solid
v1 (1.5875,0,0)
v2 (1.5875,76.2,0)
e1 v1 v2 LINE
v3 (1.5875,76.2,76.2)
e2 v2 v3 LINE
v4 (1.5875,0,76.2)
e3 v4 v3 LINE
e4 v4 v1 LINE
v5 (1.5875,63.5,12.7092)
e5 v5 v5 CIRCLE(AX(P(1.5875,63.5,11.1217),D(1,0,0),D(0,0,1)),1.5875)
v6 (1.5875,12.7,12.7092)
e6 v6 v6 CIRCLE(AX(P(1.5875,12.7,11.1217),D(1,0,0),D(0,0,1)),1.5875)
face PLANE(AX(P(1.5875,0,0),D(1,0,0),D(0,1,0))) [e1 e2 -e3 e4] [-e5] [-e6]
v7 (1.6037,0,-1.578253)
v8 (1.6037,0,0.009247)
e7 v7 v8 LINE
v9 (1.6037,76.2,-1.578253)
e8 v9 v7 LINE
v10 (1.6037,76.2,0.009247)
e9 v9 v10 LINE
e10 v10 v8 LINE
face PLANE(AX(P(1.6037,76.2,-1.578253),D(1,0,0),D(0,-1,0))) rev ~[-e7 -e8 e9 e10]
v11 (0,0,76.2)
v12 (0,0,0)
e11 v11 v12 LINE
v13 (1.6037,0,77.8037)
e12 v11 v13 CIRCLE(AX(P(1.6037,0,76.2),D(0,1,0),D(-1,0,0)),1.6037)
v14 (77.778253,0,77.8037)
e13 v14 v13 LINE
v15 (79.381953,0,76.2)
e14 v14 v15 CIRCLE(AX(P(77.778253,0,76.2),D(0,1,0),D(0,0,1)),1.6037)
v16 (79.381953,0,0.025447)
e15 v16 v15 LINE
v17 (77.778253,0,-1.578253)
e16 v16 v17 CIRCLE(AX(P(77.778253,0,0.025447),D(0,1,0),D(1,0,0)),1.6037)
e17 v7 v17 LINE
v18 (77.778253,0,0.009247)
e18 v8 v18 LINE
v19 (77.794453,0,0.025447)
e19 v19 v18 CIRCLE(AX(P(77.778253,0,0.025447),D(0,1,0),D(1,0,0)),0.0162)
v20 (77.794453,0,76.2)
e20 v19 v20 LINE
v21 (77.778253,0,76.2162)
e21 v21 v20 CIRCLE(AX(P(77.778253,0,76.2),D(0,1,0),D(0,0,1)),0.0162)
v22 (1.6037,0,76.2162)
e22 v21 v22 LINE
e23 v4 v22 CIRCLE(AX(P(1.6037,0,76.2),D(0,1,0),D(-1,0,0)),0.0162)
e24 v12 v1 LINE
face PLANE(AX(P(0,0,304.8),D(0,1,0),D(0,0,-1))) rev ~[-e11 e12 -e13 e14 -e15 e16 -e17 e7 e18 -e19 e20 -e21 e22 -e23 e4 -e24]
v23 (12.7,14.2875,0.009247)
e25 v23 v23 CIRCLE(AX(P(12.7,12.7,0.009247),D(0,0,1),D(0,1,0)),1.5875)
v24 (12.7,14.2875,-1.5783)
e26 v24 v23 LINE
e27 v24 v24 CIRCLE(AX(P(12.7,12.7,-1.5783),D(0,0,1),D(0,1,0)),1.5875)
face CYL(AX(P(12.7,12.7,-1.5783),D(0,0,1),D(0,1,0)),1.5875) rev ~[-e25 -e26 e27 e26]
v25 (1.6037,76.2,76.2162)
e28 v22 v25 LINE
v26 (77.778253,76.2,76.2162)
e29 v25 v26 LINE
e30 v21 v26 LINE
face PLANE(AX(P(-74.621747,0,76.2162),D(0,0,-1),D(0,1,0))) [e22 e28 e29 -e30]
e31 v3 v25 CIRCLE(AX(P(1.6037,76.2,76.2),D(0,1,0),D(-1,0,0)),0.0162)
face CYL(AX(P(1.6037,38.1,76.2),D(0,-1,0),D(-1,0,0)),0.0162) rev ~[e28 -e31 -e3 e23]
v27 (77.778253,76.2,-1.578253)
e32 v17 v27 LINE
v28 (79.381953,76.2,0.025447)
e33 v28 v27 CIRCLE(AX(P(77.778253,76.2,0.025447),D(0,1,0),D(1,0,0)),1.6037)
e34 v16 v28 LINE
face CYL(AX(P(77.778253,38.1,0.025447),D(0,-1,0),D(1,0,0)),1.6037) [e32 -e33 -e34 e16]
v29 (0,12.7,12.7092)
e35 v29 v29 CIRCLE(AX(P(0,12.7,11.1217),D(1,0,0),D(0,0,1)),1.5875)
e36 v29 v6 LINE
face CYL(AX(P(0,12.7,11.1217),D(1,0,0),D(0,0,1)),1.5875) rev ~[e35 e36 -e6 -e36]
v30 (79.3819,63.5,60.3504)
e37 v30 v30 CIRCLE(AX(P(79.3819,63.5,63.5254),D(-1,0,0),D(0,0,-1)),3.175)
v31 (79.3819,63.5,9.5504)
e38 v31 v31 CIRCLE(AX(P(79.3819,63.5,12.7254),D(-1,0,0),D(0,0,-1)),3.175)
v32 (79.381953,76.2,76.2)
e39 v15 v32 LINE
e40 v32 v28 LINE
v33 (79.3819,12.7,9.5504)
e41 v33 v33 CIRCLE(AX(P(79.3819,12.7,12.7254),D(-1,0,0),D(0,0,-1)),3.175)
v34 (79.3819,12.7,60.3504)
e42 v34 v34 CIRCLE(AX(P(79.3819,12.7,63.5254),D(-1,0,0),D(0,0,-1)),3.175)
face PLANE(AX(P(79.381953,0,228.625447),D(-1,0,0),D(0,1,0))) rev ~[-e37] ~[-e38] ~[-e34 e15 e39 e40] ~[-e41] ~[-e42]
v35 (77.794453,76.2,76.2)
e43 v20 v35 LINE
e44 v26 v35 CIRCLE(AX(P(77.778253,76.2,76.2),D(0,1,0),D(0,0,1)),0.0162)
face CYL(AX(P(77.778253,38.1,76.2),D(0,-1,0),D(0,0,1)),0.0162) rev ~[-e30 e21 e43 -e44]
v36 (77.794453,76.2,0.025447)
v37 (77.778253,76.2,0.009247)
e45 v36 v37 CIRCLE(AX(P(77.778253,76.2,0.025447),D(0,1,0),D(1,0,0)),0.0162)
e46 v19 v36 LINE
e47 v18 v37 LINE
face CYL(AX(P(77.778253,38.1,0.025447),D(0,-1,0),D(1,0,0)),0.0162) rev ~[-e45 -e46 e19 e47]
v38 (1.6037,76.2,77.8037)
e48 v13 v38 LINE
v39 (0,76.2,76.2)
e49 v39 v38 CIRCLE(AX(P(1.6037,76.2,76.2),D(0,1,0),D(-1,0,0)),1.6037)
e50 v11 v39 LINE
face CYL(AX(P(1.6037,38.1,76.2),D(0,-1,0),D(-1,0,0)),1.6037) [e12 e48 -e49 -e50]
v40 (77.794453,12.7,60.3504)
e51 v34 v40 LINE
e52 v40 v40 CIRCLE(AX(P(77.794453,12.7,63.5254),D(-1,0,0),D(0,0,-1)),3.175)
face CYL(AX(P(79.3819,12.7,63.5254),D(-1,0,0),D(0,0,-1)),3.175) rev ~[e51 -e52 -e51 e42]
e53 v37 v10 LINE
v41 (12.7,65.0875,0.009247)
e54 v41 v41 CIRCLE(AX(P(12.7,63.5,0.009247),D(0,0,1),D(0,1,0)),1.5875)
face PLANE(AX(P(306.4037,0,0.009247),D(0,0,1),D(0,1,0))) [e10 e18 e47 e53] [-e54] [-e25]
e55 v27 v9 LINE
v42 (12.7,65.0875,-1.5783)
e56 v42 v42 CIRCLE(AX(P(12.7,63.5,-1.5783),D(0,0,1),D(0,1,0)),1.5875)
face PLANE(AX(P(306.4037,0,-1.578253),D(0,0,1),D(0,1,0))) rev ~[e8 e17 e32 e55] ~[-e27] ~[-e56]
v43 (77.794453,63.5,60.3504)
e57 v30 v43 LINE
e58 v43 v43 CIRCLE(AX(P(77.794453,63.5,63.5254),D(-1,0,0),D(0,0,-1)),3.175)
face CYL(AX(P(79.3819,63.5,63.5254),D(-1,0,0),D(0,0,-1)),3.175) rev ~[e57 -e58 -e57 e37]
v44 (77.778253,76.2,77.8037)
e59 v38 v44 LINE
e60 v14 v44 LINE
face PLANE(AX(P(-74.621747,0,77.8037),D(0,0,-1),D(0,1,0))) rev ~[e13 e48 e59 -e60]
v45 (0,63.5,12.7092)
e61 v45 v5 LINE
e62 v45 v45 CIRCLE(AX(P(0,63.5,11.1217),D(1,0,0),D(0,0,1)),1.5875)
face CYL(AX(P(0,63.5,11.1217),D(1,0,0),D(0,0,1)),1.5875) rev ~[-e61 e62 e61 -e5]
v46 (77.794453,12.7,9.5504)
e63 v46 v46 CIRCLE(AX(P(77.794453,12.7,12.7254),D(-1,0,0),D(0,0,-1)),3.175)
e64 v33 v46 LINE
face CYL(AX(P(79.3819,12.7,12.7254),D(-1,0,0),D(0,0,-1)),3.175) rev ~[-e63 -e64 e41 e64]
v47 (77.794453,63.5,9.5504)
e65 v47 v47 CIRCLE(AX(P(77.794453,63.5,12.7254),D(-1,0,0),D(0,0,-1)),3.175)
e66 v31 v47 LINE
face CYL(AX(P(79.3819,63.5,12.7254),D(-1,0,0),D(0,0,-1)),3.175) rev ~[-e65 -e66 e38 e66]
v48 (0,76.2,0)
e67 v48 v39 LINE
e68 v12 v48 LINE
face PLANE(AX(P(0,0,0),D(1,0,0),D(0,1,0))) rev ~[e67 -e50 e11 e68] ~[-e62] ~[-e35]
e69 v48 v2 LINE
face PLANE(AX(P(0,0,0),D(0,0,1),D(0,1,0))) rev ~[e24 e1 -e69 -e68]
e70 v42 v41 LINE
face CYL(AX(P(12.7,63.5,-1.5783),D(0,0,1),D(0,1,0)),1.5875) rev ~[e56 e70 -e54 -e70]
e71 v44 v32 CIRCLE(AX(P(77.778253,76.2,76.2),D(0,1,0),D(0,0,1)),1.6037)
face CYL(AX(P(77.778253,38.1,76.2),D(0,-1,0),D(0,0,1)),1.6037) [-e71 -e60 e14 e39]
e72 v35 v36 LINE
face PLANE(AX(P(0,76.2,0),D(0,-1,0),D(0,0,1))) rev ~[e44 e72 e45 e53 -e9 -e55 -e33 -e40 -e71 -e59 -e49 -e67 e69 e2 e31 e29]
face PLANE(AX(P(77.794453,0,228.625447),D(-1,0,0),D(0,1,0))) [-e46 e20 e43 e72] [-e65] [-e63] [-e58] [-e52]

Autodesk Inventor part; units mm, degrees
ref_plane "YZ Plane" through (0, 0, 0) normal (1, 0, 0) x (0, 1, 0)
ref_plane "XZ Plane" through (0, 0, 0) normal (0, 1, 0) x (-1, 0, 0)
ref_plane "XY Plane" through (0, 0, 0) normal (0, 0, 1) x (1, 0, 0)
sketch "Sketch4" plane through (0, 0, 0) normal (1, 0, 0) x (0, 1, 0)
  line L0 (0, 0) -> (76.2, 0)
  line L1 (76.2, 0) -> (76.2, 304.8)
  line L2 (76.2, 304.8) -> (0, 304.8)
  line L3 (0, 304.8) -> (0, 0)
  dimension "d7" = 76.2
  dimension "d8" = 304.8
extrude "Extrusion2" add sketch "Sketch4" along normal blind 1.5875
sketch "Sketch5" plane through (1.5875, 0, 0) normal (1, 0, 0) x (0, 0, -1)
  line L0 (0, 0) -> (0, 76.2) projected
  line L1 (0, 76.2) -> (-304.8, 76.2) projected
  line L2 (-304.8, 76.2) -> (-304.8, 0) projected
  line L3 (-304.8, 0) -> (0, 0) projected
  line L4 (-228.6, 76.2) -> (-228.6, 0)
  line L5 (-152.4, 76.2) -> (-152.4, 0)
  line L6 (-76.2, 76.2) -> (-76.2, 0)
  dimension "d11" = 76.2
  dimension "d12" = 76.2
  dimension "d13" = 76.2
bend part "Bend Part2" radius 0.0162 angle 90 line through (1.5875, 76.2, 228.6) along (0, -1, 0) centre toward (1, 0, 0) moving side (0, 0, 1) both sides no
sketch "Sketch6" plane through (1.5875, 0, 0) normal (1, 0, 0) x (0, 0, -1)
  line L0 (-228.6, 0) -> (-228.6, 76.2) projected
  line L1 (-228.6, 0) -> (0, 0) projected
  line L2 (0, 76.2) -> (-228.6, 76.2) projected
  line L3 (-152.4, 76.2) -> (-152.4, 0)
  dimension "d16" = 76.2
bend part "Bend Part3" radius 0.0162 angle 90 line through (1.5875, 76.2, 152.4) along (0, -1, 0) centre toward (1, 0, 0) moving side (0, 0, 1) both sides no
sketch "Sketch7" plane through (1.5875, 0, 0) normal (1, 0, 0) x (0, 0, -1)
  line L0 (-152.4, 0) -> (-152.4, 76.2) projected
  line L1 (-152.4, 0) -> (0, 0) projected
  line L2 (0, 76.2) -> (-152.4, 76.2) projected
  line L3 (-76.2, 76.2) -> (-76.2, -0.6756)
  dimension "d19" = 76.2
bend part "Bend Part4" radius 0.0162 angle 90 line through (1.5875, 76.2, 76.2) along (0, -1, 0) centre toward (1, 0, 0) moving side (0, 0, 1) both sides no
sketch "Sketch8" plane through (77.7783, 0, -1.5783) normal (0, 0, -1) x (-1, 0, 0)
  line L0 (76.1746, 0) -> (0, 0) projected
  line L1 (0, 76.2) -> (76.1746, 76.2) projected
  line L2 (77.7783, 0) -> (77.7783, 76.2) projected
  point P0 (65.0783, 63.5)
  point P1 (65.0783, 12.7)
  dimension "d22" = 12.7
  dimension "d23" = 12.7
  dimension "d24" = 12.7
  dimension "d25" = 12.7
hole "Hole1" at (12.7, 63.5, -1.5783) at (12.7, 12.7, -1.5783) direction (0, 0, 1) diameter 3.175 depth 25.4 tip angle 118
sketch "Sketch9" plane through (0, 0, 0) normal (-1, 0, 0) x (0, 0, 1)
  line L0 (0, 76.2) -> (76.2, 76.2) projected
  line L1 (76.2, 0) -> (0, 0) projected
  line L2 (-1.5783, 76.2) -> (-1.5783, 0) projected
  point P0 (11.1217, 63.5)
  point P1 (11.1217, 12.7)
  dimension "d33" = 12.7
  dimension "d34" = 12.7
  dimension "d35" = 12.7
  dimension "d36" = 12.7
hole "Hole2" at (0, 63.5, 11.1217) at (0, 12.7, 11.1217) direction (1, 0, 0) diameter 3.175 depth 25.4 tip angle 118
sketch "Sketch10" plane through (79.3819, 0, 76.2) normal (1, 0, 0) x (0, 0, -1)
  line L0 (0, 76.2) -> (0, 0) projected
  line L1 (76.1746, 0) -> (0, 0) projected
  line L2 (76.1746, 76.2) -> (76.1746, 0) projected
  line L3 (0, 76.2) -> (76.1746, 76.2) projected
  point P0 (76.2, 0)
sketch "Sketch11" plane through (79.3819, 0, 76.2) normal (1, 0, 0) x (0, 0, -1)
  line L0 (76.1746, 76.2) -> (76.1746, 0) projected
  line L1 (0, 76.2) -> (76.1746, 76.2) projected
  line L2 (76.1746, 0) -> (0, 0) projected
  point P0 (76.2, 0)
  point P1 (12.6746, 63.5)
  point P2 (63.4746, 63.5)
  point P3 (12.6746, 12.7)
  point P4 (63.4746, 12.7)
  dimension "d46" = 12.7
  dimension "d47" = 12.7
  dimension "d49" = 12.7
  dimension "d57" = 12.7
  dimension "d58" = 12.7
  dimension "d59" = 50.8
  dimension "d60" = 50.8
  dimension "d61" = 12.7
hole "Hole3" at (79.3819, 63.5, 63.5254) at (79.3819, 63.5, 12.7254) at (79.3819, 12.7, 63.5254) at (79.3819, 12.7, 12.7254) direction (-1, 0, 0) diameter 6.35 depth 25.4 tip angle 118
properties part number "Box"
